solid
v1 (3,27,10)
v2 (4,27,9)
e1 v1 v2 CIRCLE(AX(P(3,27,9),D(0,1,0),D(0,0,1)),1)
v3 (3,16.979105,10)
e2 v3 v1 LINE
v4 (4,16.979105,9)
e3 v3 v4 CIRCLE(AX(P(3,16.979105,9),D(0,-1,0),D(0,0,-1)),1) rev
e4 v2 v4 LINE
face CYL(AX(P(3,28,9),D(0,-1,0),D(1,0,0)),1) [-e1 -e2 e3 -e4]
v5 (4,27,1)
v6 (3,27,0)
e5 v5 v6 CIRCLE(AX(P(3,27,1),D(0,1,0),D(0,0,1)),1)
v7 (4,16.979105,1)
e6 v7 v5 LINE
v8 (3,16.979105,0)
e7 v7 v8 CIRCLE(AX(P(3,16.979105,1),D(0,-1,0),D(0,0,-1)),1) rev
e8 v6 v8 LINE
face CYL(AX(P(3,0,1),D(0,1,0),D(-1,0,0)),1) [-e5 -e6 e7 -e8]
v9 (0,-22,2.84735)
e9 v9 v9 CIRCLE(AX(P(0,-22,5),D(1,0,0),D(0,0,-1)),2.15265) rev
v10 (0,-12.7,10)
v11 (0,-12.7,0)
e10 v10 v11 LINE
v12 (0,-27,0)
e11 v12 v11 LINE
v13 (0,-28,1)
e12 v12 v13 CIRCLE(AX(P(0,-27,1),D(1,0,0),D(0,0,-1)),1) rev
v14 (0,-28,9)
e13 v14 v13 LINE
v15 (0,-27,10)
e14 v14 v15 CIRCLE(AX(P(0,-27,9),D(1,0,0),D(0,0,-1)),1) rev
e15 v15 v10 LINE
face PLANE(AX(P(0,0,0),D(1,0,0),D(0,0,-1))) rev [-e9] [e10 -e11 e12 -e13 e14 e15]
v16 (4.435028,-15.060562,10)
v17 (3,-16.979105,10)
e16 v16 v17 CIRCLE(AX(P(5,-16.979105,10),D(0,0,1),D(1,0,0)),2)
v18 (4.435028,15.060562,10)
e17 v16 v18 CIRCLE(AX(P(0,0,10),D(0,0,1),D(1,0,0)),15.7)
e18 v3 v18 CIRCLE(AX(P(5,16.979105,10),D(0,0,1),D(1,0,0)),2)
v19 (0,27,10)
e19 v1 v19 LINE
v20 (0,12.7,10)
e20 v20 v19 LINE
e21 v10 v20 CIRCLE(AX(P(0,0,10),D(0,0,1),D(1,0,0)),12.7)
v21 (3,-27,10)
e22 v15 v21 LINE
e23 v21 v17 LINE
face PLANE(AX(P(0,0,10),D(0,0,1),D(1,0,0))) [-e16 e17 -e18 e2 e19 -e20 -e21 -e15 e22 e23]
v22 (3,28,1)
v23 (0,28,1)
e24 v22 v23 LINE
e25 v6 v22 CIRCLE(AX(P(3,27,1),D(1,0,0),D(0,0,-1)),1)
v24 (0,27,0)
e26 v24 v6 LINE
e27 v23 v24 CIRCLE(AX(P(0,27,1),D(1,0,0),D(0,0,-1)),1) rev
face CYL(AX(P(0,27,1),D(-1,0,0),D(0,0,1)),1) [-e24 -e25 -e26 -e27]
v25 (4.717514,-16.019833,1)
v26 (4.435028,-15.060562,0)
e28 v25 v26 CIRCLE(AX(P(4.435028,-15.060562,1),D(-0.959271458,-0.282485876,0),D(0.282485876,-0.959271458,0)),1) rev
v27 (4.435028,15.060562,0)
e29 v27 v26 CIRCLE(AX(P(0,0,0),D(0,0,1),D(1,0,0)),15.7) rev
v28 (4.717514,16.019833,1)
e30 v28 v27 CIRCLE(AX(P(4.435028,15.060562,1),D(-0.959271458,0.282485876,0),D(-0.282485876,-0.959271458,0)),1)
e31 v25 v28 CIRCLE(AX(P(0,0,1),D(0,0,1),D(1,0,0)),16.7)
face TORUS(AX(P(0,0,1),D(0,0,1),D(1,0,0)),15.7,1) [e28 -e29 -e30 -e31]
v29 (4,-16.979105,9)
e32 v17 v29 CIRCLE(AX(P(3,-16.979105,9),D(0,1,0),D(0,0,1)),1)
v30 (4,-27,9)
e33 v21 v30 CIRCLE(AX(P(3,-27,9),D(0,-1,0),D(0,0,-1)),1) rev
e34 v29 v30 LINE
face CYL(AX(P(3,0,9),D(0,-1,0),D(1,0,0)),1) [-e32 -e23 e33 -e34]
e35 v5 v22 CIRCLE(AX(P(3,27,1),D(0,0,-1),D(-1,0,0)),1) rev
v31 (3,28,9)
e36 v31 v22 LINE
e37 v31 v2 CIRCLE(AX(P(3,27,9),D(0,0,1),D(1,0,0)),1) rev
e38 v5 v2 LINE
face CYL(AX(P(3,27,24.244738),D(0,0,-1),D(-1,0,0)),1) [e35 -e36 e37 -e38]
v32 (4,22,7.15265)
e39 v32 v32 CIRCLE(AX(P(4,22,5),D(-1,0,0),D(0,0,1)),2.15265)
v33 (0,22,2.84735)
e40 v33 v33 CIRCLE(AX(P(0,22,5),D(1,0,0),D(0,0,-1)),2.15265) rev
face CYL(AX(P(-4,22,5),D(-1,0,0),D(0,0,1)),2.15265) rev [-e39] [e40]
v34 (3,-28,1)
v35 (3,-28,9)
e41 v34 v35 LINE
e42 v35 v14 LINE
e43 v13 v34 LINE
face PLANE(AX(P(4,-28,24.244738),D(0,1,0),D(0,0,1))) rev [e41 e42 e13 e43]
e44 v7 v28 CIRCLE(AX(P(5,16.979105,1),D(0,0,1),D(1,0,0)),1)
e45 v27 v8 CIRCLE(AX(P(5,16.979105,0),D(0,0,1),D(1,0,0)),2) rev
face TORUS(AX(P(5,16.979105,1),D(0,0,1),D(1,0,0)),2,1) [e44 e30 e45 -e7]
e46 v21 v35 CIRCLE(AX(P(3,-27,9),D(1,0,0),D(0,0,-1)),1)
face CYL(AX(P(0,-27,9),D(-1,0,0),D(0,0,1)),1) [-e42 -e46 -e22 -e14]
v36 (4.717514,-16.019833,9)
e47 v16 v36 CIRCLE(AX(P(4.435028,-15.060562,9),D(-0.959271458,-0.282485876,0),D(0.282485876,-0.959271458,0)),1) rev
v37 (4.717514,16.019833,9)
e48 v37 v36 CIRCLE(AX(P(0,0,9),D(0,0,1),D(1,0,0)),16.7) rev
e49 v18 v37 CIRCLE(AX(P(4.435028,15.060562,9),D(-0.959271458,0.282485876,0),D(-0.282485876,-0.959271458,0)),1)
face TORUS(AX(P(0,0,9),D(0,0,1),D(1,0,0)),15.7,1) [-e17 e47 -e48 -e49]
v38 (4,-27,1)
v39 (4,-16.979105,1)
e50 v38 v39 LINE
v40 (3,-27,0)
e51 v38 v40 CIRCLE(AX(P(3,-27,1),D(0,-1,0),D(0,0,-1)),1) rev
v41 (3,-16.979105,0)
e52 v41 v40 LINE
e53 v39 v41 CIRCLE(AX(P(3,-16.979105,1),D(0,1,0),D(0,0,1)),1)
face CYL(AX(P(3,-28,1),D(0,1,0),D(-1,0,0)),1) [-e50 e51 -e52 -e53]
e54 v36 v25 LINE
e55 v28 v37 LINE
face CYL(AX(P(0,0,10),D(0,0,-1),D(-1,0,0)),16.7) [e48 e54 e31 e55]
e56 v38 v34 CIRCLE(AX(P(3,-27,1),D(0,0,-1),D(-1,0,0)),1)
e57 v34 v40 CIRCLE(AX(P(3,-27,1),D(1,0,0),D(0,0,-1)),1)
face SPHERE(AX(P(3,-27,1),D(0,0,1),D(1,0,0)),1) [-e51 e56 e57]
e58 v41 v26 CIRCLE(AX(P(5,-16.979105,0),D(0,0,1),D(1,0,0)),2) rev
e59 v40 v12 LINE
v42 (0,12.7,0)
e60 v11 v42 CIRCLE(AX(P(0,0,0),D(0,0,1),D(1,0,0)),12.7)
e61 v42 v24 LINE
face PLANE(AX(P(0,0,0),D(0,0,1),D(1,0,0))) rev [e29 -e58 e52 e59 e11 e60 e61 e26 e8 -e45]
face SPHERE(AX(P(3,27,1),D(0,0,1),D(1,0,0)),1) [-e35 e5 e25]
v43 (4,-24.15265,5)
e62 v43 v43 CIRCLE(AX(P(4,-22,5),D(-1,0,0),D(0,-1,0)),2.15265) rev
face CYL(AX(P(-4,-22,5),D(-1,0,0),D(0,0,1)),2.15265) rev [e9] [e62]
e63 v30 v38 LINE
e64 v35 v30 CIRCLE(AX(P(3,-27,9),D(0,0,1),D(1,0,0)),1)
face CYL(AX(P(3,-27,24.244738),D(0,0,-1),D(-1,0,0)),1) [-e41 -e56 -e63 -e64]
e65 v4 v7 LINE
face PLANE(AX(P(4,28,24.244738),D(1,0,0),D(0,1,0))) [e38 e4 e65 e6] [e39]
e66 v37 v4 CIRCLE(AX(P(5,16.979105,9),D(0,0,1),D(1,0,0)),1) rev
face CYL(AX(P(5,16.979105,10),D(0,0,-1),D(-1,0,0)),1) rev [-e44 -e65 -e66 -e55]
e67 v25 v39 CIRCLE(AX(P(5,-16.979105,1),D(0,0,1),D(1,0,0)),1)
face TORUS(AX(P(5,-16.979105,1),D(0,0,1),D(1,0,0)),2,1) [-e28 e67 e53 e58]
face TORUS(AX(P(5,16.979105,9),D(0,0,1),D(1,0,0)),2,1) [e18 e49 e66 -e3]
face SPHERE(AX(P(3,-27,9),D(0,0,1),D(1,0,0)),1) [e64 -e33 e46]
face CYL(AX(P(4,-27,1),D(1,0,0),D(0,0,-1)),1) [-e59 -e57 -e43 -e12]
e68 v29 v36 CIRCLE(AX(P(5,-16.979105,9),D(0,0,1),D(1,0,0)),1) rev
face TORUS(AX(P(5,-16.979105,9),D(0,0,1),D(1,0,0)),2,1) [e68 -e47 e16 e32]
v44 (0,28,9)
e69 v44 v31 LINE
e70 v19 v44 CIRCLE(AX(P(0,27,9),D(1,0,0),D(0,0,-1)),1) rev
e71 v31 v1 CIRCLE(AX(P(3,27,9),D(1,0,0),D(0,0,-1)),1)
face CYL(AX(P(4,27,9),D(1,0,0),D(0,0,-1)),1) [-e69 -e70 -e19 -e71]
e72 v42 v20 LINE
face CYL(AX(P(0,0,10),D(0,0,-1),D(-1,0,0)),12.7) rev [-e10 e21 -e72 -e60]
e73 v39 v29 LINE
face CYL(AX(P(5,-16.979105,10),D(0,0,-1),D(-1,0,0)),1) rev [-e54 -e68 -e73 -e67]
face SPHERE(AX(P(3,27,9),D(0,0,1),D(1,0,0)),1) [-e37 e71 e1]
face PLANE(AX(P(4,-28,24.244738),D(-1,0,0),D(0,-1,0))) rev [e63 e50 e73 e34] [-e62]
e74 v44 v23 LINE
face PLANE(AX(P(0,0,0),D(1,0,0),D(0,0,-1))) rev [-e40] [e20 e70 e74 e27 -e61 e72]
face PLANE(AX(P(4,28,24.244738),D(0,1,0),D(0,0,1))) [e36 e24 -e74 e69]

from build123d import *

# Parameters (mm, degrees)
SKETCH1_R                                         = 16.7
SKETCH1_R_2                                       = 12.7
BOSS_EXTRUDE1_DEPTH                               = 10
SKETCH2_W                                         = 22.16607393
SKETCH2_H                                         = 10
SKETCH2_W_2                                       = 4
SKETCH2_H_2                                       = 30
BOSS_EXTRUDE2_DEPTH                               = 10
SKETCH4_W                                         = 8
SKETCH4_H                                         = 11.78611706
BOSS_EXTRUDE3_DEPTH                               = 10
FILLET3_R                                         = 1
CSK_FOR_6_FLAT_HEAD_MACHINE_SCREW_100_D           = 4.3053
CSK_FOR_6_FLAT_HEAD_MACHINE_SCREW_100_CSINK_D     = 7.0866
CSK_FOR_6_FLAT_HEAD_MACHINE_SCREW_100_CSINK_ANGLE = 100
INTERSECT3_START                                  = -42.1
INTERSECT3_OUTLINE_R                              = 2.15265
INTERSECT3_DEPTH                                  = 42.1


# Read off the part's stored shape, not the designer's step: CSK for #4 Flat Head Machine Screw (100)1, Intersect3
with BuildPart() as part:
    # Sketch1 → Boss-Extrude1 (new body)
    with BuildSketch(Plane.XY):
        Circle(SKETCH1_R)
        Circle(SKETCH1_R_2, mode=Mode.SUBTRACT)
    extrude(amount=BOSS_EXTRUDE1_DEPTH)

    # Sketch2 → Boss-Extrude2 (add)
    with BuildSketch(Plane(origin=(0, 0, 0), x_dir=(-1, 0, 0), z_dir=(0, 0, -1))):
        with Locations((27.016963035, 0)):
            Rectangle(SKETCH2_W, SKETCH2_H)
        with Locations((40.1, 0)):
            Rectangle(SKETCH2_W_2, SKETCH2_H_2)
    extrude(amount=-BOSS_EXTRUDE2_DEPTH)

    # Sketch4 → Boss-Extrude3 (add)
    with BuildSketch(Plane(origin=(0, 0, 0), x_dir=(-1, 0, 0), z_dir=(0, 0, -1))):
        with Locations((0, 22.10694147)):
            Rectangle(SKETCH4_W, SKETCH4_H)
    boss_extrude3 = extrude(amount=-BOSS_EXTRUDE3_DEPTH)

    # Mirror1: Boss-Extrude3 across plane
    add(boss_extrude3.mirror(Plane.ZX))

    # Fillet3
    fillet3_edges = [part.edges().sort_by_distance(p)[0] for p in [
        (-11.435827246, -12.170121413, 10),
        (-11.435827246, -12.170121413, 0),
        (-38.1, 10, 10),
        (-40.1, -15, 10),
        (-27.016963035, -5, 10),
        (-38.1, -10, 0),
        (-40.1, 15, 0),
        (-38.1, 10, 0),
        (-27.016963035, 5, 0),
        (-38.1, -10, 10),
        (-40.1, -15, 0),
        (-40.1, 15, 10),
        (-15.93392607, -5, 5),
        (-27.016963035, -5, 0),
        (-27.016963035, 5, 10),
        (-15.93392607, 5, 5),
        (-11.435827246, 12.170121413, 0),
        (-11.435827246, 12.170121413, 10),
        (-4, 22.10694147, 0),
        (0, 28, 0),
        (4, 22.10694147, 0),
        (0, 28, 10),
        (4, 28, 5),
        (4, 22.10694147, 10),
        (4, 16.21388294, 5),
        (-4, 16.21388294, 5),
        (-4, 22.10694147, 10),
        (-4, 28, 5),
        (16.7, 0, 0),
        (16.7, 0, 10),
        (-4, -16.21388294, 5),
        (-4, -22.10694147, 0),
        (-4, -28, 5),
        (0, -28, 0),
        (4, -28, 5),
        (4, -22.10694147, 0),
        (4, -16.21388294, 5),
        (-4, -22.10694147, 10),
        (0, -28, 10),
        (4, -22.10694147, 10),
    ]]
    fillet(fillet3_edges, radius=FILLET3_R)

    # CSK for _4 Flat Head Machine Screw _ 2 → CSK for #4 Flat Head Machine Screw (100)1 (revolve, cut)
    with BuildSketch(Plane(origin=(0, -9, 5), x_dir=(0, 1, 0), z_dir=(0, 0, -1))):
        Polygon((0, -42.1), (1.7272, -42.1), (1.7272, -39.048434313), (2.8575, -38.1), (0, -38.1), align=None)
    csk_for_4_flat_head_machine_screw_100 = revolve(axis=Axis((0, -9, 5), (1, 0, 0)), mode=Mode.SUBTRACT)

    # Mirror2: CSK for #4 Flat Head Machine Screw (100)1 across plane
    add(csk_for_4_flat_head_machine_screw_100.mirror(Plane.ZX), mode=Mode.SUBTRACT)

    # CSK for #6 Flat Head Machine Screw (100)5 (through all)
    with Locations(Plane.ZY.offset(4)):
        with Locations((5, -22)):
            csk_for_6_flat_head_machine_screw_100 = CounterSinkHole(CSK_FOR_6_FLAT_HEAD_MACHINE_SCREW_100_D / 2, CSK_FOR_6_FLAT_HEAD_MACHINE_SCREW_100_CSINK_D / 2, counter_sink_angle=CSK_FOR_6_FLAT_HEAD_MACHINE_SCREW_100_CSINK_ANGLE)

    # Mirror5: CSK for #6 Flat Head Machine Screw (100)5 across plane
    add(csk_for_6_flat_head_machine_screw_100.mirror(Plane.ZX), mode=Mode.SUBTRACT)

    # Intersect3 outline → Intersect3 (cut)
    with BuildSketch(Plane.YZ.offset(INTERSECT3_START)):
        with BuildLine():
            ThreePointArc((28, 9), (27.707106781, 9.707106781), (27, 10))
            Line((27, 10), (-27, 10))
            ThreePointArc((-27, 10), (-27.707106781, 9.707106781), (-28, 9))
            Line((-28, 9), (-28, 1))
            ThreePointArc((-28, 1), (-27.707106781, 0.292893219), (-27, 0))
            Line((-27, 0), (27, 0))
            ThreePointArc((27, 0), (27.707106781, 0.292893219), (28, 1))
            Line((28, 1), (28, 9))
        make_face()
        with Locations((22, 5)):
            Circle(INTERSECT3_OUTLINE_R, mode=Mode.SUBTRACT)
        with Locations((-22, 5)):
            Circle(INTERSECT3_OUTLINE_R, mode=Mode.SUBTRACT)
    extrude(amount=INTERSECT3_DEPTH, mode=Mode.SUBTRACT)


solid = part.part
